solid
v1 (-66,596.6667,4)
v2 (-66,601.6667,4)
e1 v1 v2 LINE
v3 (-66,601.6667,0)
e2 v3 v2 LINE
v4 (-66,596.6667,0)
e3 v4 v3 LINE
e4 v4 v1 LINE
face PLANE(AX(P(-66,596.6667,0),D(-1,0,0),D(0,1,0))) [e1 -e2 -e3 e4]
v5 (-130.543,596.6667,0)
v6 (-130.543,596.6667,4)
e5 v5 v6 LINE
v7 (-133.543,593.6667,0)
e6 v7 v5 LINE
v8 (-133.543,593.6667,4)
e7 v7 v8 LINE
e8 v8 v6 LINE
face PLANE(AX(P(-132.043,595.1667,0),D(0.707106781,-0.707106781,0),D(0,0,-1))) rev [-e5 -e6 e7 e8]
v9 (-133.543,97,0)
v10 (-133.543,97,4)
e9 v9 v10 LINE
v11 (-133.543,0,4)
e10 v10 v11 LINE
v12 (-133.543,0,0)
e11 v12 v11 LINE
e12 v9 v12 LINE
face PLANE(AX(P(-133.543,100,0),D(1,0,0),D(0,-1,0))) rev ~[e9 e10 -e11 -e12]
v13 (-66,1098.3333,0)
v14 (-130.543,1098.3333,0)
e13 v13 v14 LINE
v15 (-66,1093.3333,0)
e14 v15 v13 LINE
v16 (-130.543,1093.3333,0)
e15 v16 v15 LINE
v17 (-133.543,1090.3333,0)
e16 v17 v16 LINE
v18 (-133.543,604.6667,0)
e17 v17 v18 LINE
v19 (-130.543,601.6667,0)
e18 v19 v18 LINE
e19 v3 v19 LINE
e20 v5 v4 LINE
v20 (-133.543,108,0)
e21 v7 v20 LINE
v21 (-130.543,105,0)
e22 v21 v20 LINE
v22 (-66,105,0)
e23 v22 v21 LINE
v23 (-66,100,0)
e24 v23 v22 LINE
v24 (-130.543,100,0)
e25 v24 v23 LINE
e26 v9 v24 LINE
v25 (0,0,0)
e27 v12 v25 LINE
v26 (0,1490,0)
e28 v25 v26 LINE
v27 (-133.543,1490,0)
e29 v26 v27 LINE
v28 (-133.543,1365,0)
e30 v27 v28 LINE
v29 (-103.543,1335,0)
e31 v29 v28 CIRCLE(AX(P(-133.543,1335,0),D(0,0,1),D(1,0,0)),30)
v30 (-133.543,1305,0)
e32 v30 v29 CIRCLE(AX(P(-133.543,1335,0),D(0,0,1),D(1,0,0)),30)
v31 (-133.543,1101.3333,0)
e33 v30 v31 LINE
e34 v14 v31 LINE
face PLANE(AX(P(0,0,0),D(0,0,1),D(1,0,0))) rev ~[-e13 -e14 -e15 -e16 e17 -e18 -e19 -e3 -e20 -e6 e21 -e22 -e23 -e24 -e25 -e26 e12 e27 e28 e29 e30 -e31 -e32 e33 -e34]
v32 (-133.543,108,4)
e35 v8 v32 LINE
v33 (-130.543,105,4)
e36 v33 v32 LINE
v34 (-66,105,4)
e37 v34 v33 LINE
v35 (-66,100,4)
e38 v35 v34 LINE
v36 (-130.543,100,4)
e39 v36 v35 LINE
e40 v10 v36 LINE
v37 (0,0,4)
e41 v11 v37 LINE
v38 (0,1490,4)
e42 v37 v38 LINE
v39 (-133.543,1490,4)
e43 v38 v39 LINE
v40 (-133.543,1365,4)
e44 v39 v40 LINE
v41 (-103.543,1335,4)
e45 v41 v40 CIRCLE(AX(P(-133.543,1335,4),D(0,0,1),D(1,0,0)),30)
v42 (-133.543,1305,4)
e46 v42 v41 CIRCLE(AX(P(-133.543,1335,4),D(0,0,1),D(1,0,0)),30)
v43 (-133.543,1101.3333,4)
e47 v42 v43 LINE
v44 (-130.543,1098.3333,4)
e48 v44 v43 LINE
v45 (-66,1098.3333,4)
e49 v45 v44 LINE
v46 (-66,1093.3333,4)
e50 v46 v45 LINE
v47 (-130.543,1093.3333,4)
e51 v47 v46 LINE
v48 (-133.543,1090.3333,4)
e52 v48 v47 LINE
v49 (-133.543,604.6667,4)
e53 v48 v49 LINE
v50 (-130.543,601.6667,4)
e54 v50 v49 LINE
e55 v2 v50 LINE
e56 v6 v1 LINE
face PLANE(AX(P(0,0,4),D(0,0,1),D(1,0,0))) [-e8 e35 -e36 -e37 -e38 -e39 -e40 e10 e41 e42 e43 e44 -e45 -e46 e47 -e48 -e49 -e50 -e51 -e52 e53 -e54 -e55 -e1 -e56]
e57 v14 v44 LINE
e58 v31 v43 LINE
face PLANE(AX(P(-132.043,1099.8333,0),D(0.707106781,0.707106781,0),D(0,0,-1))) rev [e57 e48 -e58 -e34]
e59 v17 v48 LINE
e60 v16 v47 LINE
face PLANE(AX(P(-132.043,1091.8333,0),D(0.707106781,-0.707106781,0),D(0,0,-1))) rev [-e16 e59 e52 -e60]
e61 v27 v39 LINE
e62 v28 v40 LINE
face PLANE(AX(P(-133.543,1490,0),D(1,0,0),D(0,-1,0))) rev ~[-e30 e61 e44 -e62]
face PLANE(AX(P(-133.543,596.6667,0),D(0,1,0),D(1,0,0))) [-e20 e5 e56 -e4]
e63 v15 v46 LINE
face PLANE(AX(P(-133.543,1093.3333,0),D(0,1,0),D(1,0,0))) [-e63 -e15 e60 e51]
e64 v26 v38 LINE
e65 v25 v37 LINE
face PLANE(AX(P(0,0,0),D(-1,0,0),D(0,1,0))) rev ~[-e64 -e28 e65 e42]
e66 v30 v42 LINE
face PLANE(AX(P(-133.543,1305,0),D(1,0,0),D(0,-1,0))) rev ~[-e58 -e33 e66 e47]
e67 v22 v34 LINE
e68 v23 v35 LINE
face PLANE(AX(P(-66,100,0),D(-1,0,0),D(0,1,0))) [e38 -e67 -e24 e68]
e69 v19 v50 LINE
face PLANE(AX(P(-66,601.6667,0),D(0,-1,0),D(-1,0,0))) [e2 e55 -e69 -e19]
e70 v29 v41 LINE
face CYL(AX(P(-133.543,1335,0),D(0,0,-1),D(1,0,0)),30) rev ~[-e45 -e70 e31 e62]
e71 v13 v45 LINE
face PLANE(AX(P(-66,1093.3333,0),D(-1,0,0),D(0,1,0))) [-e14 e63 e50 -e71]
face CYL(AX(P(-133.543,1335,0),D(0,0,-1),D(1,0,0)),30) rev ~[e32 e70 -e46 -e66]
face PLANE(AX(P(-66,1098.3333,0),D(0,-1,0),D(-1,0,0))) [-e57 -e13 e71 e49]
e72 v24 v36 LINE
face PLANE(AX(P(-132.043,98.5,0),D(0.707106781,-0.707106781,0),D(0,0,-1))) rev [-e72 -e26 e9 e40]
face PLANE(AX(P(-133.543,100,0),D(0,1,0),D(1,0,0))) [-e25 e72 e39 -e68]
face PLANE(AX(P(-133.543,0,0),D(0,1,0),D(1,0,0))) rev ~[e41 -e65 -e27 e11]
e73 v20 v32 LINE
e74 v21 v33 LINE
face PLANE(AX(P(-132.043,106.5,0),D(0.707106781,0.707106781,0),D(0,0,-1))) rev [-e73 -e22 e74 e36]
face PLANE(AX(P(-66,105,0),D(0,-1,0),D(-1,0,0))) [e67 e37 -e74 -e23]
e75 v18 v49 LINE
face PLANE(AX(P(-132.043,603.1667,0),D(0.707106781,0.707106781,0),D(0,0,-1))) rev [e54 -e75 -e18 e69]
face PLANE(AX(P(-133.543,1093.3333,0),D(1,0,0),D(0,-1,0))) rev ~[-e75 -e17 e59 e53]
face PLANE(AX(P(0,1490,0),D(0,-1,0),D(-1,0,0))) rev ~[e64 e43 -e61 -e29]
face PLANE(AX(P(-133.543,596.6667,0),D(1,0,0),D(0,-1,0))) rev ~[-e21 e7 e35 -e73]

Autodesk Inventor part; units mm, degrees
ref_plane "YZ Plane" through (0, 0, 0) normal (1, 0, 0) x (0, 1, 0)
ref_plane "XZ Plane" through (0, 0, 0) normal (0, 1, 0) x (-1, 0, 0)
ref_plane "XY Plane" through (0, 0, 0) normal (0, 0, 1) x (1, 0, 0)
sketch "Sketch1" plane through (0, 0, 0) normal (0, 0, 1) x (1, 0, 0)
  line L0 (0, 1490) -> (-133.543, 1490)
  line L1 (-133.543, 1490) -> (-133.543, 0)
  line L2 (-133.543, 0) -> (0, 0)
  line L3 (0, 0) -> (0, 1490)
  line L4 (-133.543, 100) -> (-66, 100)
  line L5 (-66, 100) -> (-66, 105)
  line L6 (-66, 105) -> (-133.543, 105)
  line L7 (-133.543, 105) -> (-133.543, 100)
  line L8 (-133.543, 596.6667) -> (-66, 596.6667)
  line L9 (-66, 596.6667) -> (-66, 601.6667)
  line L10 (-66, 601.6667) -> (-133.543, 601.6667)
  line L11 (-133.543, 601.6667) -> (-133.543, 596.6667)
  line L12 (-133.543, 1093.3333) -> (-66, 1093.3333)
  line L13 (-66, 1093.3333) -> (-66, 1098.3333)
  line L14 (-66, 1098.3333) -> (-133.543, 1098.3333)
  line L15 (-133.543, 1098.3333) -> (-133.543, 1093.3333)
  circle A0 centre (-133.543, 1335) radius 30
  point P0 (-133.543, 105)
  point P1 (-133.543, 1365)
  point P2 (-133.543, 1305)
  dimension "d0" = 1490
  dimension "d1" = 133.543
  dimension "d2" = 5
  dimension "d4" = 100
  dimension "d7" = 496.6667
  dimension "d23" = 66
  dimension "d29" = 60
  dimension "d30" = 1335
extrude "Plate1" add sketch "Sketch1" along normal blind 4 contours L3 L2 L1 L4 L5 L6 L8 L9 L10 L12 L13 L14 A0 L0
chamfer "Corner Chamfer1" distance 3 angle 45 6 edges at (-133.543, 100, 2) (-133.543, 105, 2) (-133.543, 596.6667, 2) (-133.543, 601.6667, 2) (-133.543, 1098.3333, 2) (-133.543, 1093.3333, 2)
equation "\"d0\" = Стрингер_длина"
equation "\"d1\" = стрингер_глубина_6"
equation "\"d2\" = паз_под_стрингер_толщина"
equation "\"d7\" = Шаг_шпангоутов"
equation "\"d23\" = паз_под_стрингер_глубина - Thickness"
equation "\"d29\" = 2 * радиус_выреза_под_сварку"
equation "\"d12\" = Thickness"
equation "\"BendRadius\" = Thickness"
equation "\"BendReliefWidth\" = Thickness"
equation "\"BendReliefDepth\" = 0.5 * Thickness"
equation "\"CornerReliefSize\" = 4 * Thickness"
equation "\"MinimumRemnant\" = 2 * Thickness"
equation "\"TransitionRadius\" = BendRadius"
equation "\"JacobiRadiusSize\" = BendRadius"
equation "\"GapSize\" = Thickness"
equation "\"Стрингер_длина\" = 1490"
equation "\"стрингер_глубина_6\" = 133.543003"
equation "\"паз_под_стрингер_толщина\" = 5"
equation "\"Шаг_шпангоутов\" = 496.666667"
equation "\"паз_под_стрингер_глубина\" = 70"
equation "\"Thickness\" = 4"
equation "\"радиус_выреза_под_сварку\" = 30"
properties part number "GBK 3204 stringer 6" material "Steel"
